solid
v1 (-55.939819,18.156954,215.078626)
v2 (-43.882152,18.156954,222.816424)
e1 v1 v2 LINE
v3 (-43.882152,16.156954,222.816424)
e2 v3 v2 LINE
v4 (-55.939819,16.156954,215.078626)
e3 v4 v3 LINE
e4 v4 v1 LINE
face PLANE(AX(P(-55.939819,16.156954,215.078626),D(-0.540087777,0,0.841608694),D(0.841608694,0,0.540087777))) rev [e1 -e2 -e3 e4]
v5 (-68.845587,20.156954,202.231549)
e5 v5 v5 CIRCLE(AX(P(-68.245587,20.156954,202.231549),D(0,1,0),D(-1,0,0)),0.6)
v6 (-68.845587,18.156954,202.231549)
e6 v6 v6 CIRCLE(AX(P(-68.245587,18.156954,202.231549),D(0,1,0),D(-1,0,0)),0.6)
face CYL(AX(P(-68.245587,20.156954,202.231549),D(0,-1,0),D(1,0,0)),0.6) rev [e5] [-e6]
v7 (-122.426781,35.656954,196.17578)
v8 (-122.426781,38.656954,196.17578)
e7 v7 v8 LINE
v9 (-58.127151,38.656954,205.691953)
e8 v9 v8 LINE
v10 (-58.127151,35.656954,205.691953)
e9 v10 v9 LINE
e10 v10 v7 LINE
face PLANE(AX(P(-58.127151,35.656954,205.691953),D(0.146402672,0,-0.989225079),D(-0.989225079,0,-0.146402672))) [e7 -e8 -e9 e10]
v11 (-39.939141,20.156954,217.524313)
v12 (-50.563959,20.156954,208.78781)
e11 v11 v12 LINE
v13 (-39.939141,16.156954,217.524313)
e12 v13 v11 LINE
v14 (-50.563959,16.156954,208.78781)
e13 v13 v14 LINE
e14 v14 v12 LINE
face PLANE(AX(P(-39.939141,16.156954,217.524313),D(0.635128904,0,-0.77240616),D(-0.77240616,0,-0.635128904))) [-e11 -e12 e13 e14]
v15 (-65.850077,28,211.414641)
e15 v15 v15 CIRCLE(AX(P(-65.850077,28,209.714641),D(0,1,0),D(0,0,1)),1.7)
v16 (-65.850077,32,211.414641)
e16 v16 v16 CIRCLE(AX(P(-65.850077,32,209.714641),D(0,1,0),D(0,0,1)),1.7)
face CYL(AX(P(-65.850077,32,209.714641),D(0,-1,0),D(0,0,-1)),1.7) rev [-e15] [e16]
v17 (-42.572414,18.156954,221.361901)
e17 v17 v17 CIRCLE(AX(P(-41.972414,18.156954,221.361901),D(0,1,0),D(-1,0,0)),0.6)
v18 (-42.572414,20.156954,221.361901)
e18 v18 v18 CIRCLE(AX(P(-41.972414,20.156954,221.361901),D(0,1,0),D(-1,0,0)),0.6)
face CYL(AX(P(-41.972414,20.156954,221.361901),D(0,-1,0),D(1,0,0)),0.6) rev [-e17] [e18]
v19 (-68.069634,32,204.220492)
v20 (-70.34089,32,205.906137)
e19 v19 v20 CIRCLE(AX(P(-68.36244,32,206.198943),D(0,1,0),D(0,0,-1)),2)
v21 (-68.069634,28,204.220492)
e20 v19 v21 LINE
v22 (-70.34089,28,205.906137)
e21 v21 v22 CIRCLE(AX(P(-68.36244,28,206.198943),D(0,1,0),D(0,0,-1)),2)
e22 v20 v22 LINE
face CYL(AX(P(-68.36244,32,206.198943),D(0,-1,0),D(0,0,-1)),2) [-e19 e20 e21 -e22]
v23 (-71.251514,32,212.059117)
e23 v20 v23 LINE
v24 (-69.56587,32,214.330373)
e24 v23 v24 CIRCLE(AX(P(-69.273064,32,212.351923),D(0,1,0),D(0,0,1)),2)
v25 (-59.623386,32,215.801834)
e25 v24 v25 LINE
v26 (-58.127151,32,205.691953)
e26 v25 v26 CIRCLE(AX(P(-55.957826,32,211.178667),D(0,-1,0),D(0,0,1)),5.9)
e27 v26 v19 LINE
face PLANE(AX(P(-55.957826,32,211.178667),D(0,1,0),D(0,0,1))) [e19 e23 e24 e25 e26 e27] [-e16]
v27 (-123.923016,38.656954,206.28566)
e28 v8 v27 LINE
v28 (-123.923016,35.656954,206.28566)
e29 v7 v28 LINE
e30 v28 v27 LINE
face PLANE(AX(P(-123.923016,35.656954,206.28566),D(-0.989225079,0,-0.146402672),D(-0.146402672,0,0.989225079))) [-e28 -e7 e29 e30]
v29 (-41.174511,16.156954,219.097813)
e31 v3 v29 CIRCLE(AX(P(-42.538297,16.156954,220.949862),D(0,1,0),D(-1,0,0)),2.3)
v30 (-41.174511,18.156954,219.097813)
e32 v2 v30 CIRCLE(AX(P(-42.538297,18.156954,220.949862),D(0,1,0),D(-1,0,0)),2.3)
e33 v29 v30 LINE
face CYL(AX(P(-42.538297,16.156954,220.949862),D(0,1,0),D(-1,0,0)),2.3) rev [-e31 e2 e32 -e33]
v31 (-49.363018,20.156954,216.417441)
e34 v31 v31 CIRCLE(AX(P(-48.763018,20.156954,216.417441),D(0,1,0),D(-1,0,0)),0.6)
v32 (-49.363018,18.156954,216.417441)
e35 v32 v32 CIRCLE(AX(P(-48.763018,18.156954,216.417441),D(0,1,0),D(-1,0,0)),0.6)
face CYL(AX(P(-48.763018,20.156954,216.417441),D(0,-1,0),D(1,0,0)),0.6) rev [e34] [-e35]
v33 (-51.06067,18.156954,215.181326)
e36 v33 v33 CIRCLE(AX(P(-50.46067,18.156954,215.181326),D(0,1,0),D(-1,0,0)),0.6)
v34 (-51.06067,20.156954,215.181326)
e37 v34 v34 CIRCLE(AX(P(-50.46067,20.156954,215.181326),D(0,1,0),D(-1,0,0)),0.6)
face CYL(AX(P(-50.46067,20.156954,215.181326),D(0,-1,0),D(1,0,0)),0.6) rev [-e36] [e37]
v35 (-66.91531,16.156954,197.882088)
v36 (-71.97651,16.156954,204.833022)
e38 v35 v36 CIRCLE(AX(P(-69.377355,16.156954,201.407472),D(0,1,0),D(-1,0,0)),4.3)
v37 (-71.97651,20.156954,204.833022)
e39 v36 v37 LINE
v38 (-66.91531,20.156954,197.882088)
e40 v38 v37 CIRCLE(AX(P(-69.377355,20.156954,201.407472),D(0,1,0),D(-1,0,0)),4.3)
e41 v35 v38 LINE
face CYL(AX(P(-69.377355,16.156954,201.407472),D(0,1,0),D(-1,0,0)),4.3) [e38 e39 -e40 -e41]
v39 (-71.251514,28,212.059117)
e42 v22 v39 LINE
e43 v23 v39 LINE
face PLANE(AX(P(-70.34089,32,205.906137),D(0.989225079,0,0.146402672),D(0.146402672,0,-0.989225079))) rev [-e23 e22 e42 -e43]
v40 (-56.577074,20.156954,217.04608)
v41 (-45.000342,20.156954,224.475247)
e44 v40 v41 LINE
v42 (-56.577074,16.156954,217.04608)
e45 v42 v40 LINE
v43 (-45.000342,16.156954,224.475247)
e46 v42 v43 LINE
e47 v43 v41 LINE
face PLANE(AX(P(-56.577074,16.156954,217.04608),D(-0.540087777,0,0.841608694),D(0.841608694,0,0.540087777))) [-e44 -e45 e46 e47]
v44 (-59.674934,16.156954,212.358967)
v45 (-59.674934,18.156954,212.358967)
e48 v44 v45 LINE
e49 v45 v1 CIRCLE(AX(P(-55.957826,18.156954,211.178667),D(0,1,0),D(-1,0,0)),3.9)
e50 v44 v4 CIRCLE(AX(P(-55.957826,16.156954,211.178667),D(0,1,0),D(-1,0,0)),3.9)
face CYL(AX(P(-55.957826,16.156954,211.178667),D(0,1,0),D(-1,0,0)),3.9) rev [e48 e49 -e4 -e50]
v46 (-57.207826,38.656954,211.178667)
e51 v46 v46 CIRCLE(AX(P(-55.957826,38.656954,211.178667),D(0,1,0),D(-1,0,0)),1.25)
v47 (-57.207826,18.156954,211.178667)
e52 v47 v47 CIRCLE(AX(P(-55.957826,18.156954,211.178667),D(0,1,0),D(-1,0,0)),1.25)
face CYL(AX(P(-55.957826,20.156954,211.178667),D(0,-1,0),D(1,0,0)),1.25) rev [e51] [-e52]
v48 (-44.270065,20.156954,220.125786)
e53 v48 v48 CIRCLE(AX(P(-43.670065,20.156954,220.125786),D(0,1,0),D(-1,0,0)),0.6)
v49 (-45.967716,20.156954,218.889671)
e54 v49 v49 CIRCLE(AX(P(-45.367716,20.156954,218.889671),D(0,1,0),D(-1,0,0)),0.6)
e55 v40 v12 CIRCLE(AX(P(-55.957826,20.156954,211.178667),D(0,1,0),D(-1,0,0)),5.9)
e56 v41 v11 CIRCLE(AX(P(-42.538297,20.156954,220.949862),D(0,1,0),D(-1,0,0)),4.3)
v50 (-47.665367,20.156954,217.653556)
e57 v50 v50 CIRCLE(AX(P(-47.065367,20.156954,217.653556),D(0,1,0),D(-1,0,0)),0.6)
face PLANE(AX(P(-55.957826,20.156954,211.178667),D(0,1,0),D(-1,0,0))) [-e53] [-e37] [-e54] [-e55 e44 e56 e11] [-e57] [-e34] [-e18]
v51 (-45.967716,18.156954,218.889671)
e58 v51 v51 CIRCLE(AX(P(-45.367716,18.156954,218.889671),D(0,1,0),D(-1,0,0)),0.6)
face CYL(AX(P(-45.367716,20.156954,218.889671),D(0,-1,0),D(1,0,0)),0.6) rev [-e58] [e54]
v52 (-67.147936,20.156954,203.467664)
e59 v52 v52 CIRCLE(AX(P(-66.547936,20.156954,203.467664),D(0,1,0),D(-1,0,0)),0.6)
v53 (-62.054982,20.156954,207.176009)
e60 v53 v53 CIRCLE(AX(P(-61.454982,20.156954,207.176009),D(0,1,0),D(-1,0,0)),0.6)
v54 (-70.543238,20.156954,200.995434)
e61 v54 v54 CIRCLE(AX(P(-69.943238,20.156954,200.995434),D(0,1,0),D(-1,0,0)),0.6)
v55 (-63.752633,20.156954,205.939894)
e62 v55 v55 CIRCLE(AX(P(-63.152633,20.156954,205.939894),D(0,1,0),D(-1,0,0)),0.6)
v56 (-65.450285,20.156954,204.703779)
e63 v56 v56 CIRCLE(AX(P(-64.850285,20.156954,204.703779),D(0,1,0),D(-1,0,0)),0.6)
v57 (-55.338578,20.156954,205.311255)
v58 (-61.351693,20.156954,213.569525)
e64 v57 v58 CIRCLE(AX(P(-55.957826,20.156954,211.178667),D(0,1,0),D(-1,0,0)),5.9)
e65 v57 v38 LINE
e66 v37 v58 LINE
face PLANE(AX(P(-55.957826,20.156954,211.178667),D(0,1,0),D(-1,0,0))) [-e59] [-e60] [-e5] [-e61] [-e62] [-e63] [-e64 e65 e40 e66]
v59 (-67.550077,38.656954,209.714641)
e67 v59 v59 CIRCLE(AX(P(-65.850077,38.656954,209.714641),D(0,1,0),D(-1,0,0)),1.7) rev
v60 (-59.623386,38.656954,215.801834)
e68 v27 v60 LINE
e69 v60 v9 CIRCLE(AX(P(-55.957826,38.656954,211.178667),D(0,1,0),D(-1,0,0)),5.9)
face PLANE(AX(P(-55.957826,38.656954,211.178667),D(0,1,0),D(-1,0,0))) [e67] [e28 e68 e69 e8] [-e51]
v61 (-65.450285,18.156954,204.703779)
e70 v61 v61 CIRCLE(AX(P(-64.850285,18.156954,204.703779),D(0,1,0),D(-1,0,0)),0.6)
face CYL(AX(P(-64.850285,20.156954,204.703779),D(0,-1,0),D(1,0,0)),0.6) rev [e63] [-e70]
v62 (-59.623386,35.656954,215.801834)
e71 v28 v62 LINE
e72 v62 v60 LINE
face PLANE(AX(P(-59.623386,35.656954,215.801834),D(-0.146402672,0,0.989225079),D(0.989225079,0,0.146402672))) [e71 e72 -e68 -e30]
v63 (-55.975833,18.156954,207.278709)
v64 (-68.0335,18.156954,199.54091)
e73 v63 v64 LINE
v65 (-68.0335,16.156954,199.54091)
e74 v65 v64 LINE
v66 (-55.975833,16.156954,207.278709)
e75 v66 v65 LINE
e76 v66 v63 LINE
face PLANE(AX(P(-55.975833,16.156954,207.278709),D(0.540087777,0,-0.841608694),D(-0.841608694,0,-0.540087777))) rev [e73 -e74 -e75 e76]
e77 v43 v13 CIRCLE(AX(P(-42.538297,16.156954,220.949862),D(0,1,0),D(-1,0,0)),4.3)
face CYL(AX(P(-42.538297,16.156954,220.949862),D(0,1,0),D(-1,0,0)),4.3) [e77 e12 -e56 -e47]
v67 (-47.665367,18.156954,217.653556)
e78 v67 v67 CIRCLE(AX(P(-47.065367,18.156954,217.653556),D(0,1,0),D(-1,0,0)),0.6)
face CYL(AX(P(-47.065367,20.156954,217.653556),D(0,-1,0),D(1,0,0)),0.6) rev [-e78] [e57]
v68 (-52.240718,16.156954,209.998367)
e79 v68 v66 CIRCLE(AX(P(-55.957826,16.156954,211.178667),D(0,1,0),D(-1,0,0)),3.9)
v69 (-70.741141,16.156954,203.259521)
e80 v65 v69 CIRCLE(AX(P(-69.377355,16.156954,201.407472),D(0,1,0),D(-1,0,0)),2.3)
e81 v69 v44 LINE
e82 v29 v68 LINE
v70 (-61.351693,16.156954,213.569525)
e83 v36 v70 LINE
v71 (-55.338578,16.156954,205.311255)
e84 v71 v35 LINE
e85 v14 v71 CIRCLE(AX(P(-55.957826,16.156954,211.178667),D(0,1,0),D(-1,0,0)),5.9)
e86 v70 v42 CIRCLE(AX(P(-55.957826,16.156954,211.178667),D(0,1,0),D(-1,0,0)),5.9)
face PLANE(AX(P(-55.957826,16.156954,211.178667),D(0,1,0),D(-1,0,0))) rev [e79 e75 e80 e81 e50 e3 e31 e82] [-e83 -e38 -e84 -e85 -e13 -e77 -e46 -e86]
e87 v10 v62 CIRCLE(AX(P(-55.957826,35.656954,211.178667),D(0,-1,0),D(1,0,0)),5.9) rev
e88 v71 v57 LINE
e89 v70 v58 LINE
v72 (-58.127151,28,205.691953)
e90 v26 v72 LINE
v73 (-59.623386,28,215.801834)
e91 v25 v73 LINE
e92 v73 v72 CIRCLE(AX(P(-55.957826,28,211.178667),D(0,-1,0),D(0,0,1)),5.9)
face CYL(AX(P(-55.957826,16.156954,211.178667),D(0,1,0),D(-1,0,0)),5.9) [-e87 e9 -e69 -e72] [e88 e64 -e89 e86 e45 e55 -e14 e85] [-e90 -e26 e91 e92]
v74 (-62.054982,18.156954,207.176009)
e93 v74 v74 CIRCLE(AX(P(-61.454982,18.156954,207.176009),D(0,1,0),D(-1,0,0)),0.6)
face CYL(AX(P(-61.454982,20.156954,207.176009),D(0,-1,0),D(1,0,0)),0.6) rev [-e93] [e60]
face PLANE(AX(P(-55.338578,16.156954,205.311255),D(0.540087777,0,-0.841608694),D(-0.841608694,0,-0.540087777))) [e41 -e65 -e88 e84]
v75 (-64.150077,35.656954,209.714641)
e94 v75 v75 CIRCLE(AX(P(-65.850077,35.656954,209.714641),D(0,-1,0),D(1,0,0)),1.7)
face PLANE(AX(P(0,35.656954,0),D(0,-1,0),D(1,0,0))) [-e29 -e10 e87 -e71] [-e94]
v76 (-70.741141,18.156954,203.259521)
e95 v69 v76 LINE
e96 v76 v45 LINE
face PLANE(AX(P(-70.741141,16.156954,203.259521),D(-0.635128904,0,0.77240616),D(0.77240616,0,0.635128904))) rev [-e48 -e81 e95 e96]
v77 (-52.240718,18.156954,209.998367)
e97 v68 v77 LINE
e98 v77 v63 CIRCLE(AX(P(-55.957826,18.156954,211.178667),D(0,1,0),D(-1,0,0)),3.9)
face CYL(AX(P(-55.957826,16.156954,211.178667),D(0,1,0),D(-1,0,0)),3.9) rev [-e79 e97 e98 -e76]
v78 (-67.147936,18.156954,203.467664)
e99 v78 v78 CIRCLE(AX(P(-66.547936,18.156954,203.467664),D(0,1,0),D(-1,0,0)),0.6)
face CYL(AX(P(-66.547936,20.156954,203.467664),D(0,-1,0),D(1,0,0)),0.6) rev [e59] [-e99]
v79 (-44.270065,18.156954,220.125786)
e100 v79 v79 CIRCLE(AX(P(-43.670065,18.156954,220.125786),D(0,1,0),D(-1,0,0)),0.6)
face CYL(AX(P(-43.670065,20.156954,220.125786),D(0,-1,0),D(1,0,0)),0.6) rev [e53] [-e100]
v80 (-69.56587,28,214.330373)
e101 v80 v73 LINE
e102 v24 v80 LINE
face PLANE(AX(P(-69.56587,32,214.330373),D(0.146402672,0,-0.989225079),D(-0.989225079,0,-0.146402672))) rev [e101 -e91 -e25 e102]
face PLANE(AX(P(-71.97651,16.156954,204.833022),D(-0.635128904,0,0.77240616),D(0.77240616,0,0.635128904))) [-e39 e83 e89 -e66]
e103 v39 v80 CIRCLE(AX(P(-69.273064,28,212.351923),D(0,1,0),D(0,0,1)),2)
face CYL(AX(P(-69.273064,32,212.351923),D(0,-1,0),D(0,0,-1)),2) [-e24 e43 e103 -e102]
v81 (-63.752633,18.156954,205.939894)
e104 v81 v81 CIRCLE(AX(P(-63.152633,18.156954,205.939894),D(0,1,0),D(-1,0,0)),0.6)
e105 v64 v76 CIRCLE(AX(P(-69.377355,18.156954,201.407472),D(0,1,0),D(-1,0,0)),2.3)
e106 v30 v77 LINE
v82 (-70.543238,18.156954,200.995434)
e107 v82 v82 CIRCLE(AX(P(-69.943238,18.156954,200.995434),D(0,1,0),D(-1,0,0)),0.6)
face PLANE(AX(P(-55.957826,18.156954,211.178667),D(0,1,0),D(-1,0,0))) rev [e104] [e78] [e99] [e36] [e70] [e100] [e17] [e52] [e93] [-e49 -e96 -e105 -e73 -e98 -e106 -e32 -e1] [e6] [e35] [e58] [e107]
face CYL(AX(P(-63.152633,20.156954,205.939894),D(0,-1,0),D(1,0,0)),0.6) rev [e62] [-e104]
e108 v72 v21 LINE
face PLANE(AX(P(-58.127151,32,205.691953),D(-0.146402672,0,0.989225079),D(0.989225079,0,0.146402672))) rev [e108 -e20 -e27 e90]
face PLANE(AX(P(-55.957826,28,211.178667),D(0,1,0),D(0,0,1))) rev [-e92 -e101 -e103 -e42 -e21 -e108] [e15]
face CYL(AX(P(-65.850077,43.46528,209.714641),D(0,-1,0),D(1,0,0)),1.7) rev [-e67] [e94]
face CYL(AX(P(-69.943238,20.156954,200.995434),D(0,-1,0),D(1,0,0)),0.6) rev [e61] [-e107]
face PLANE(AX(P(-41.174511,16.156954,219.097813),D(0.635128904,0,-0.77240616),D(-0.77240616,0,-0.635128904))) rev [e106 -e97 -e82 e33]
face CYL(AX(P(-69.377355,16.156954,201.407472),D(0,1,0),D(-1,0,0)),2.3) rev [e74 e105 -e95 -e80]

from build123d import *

# Parameters (mm, degrees)
EXTRUDE_START       = -2
EXTRUDE_1_DEPTH     = 2
SKETCH_2_R          = 0.6
SKETCH_2_R_2        = 1.25
EXTRUDE_2_DEPTH     = 2
SKETCH_3_R          = 5.9
SKETCH_3_R_2        = 1.25
EXTRUDE_3_DEPTH     = 18.5
EXTRUDE_4_DEPTH     = 3
SKETCH_5_R          = 1.7
CUT_EXTRUDE_1_DEPTH = 3
SKETCH_6_R          = 1.7
EXTRUDE_5_DEPTH     = 4


# Read off the part's stored shape, not the designer's step: 填料-伸長1
with BuildPart() as part:
    # 填料-伸長1 outline → 填料-伸長1 (new body)
    with BuildSketch(Plane(origin=(0, 18.156954032, 0), x_dir=(1, 0, 0), z_dir=(0, 1, 0)).offset(EXTRUDE_START)):
        with BuildLine():
            Line((-71.976510321, -204.833021781), (-61.351692907, -213.569524655))
            ThreePointArc((-61.351692907, -213.569524655), (-59.430720516, -215.948258819), (-56.577073779, -217.046080048))
            Line((-56.577073779, -217.046080048), (-45.000342303, -224.475246616))
            ThreePointArc((-45.000342303, -224.475246616), (-39.06215434, -223.480955011), (-39.939141491, -217.524312868))
            Line((-39.939141491, -217.524312868), (-50.563958905, -208.787809993))
            ThreePointArc((-50.563958905, -208.787809993), (-52.484931295, -206.409075829), (-55.338578032, -205.311254601))
            Line((-55.338578032, -205.311254601), (-66.915309509, -197.882088033))
            ThreePointArc((-66.915309509, -197.882088033), (-72.853497472, -198.876379638), (-71.976510321, -204.833021781))
        make_face()
        with BuildLine():
            ThreePointArc((-55.939819286, -215.078625755), (-58.253468106, -214.331448143), (-59.674933886, -212.358967399))
            Line((-59.674933886, -212.358967399), (-70.741141252, -203.259521387))
            ThreePointArc((-70.741141252, -203.259521387), (-71.236686796, -200.053632048), (-68.033499603, -199.540910248))
            Line((-68.033499603, -199.540910248), (-55.975832526, -207.278708894))
            ThreePointArc((-55.975832526, -207.278708894), (-53.662183706, -208.025886506), (-52.240717926, -209.998367249))
            Line((-52.240717926, -209.998367249), (-41.17451056, -219.097813262))
            ThreePointArc((-41.17451056, -219.097813262), (-40.678965016, -222.303702601), (-43.882152209, -222.8164244))
            Line((-43.882152209, -222.8164244), (-55.939819286, -215.078625755))
        make_face(mode=Mode.SUBTRACT)
    extrude(amount=EXTRUDE_1_DEPTH)

    # 草圖2 → 填料-伸長2 (add)
    with BuildSketch(Plane(origin=(0, 18.156954032, 0), x_dir=(1, 0, 0), z_dir=(0, 1, 0))):
        with BuildLine():
            Line((-56.577073779, -217.046080048), (-45.000342303, -224.475246616))
            ThreePointArc((-45.000342303, -224.475246616), (-39.06215434, -223.480955011), (-39.939141491, -217.524312868))
            Line((-39.939141491, -217.524312868), (-50.563958905, -208.787809993))
            ThreePointArc((-50.563958905, -208.787809993), (-52.484931296, -206.409075829), (-55.338578032, -205.311254601))
            Line((-55.338578032, -205.311254601), (-66.915309509, -197.882088033))
            ThreePointArc((-66.915309509, -197.882088033), (-72.853497472, -198.876379638), (-71.976510321, -204.833021781))
            Line((-71.976510321, -204.833021781), (-61.351692907, -213.569524655))
            ThreePointArc((-61.351692907, -213.569524655), (-59.430720516, -215.948258819), (-56.577073779, -217.046080048))
        make_face()
        with Locations(Location((-69.943238255, -200.995433976, 0), (0, 0, 180))):
            Circle(SKETCH_2_R, mode=Mode.SUBTRACT)
        with Locations(Location((-68.245587045, -202.231549007, 0), (0, 0, 180))):
            Circle(SKETCH_2_R, mode=Mode.SUBTRACT)
        with Locations(Location((-66.547935835, -203.467664037, 0), (0, 0, 180))):
            Circle(SKETCH_2_R, mode=Mode.SUBTRACT)
        with Locations(Location((-64.850284625, -204.703779068, 0), (0, 0, 180))):
            Circle(SKETCH_2_R, mode=Mode.SUBTRACT)
        with Locations(Location((-63.152633415, -205.939894099, 0), (0, 0, 180))):
            Circle(SKETCH_2_R, mode=Mode.SUBTRACT)
        with Locations(Location((-61.454982205, -207.17600913, 0), (0, 0, 180))):
            Circle(SKETCH_2_R, mode=Mode.SUBTRACT)
        with Locations(Location((-55.957825906, -211.178667324, 0), (0, 0, 180))):
            Circle(SKETCH_2_R_2, mode=Mode.SUBTRACT)
        with Locations(Location((-50.460669607, -215.181325519, 0), (0, 0, 180))):
            Circle(SKETCH_2_R, mode=Mode.SUBTRACT)
        with Locations(Location((-48.763018397, -216.41744055, 0), (0, 0, 180))):
            Circle(SKETCH_2_R, mode=Mode.SUBTRACT)
        with Locations(Location((-47.065367187, -217.65355558, 0), (0, 0, 180))):
            Circle(SKETCH_2_R, mode=Mode.SUBTRACT)
        with Locations(Location((-45.367715977, -218.889670611, 0), (0, 0, 180))):
            Circle(SKETCH_2_R, mode=Mode.SUBTRACT)
        with Locations(Location((-43.670064767, -220.125785642, 0), (0, 0, 180))):
            Circle(SKETCH_2_R, mode=Mode.SUBTRACT)
        with Locations(Location((-41.972413557, -221.361900673, 0), (0, 0, 180))):
            Circle(SKETCH_2_R, mode=Mode.SUBTRACT)
    extrude(amount=EXTRUDE_2_DEPTH)

    # 草圖3 → 填料-伸長3 (add)
    with BuildSketch(Plane(origin=(0, 20.156954032, 0), x_dir=(1, 0, 0), z_dir=(0, 1, 0))):
        with Locations(Location((-55.957825906, -211.178667324, 0), (0, 0, 180))):
            Circle(SKETCH_3_R)
        with Locations(Location((-55.957825906, -211.178667324, 0), (0, 0, 180))):
            Circle(SKETCH_3_R_2, mode=Mode.SUBTRACT)
    extrude(amount=EXTRUDE_3_DEPTH)

    # 草圖4 → 填料-伸長4 (add)
    with BuildSketch(Plane(origin=(0, 38.656954032, 0), x_dir=(1, 0, 0), z_dir=(0, 1, 0))):
        Polygon((-59.623386181, -215.801833758), (-58.127150876, -205.691953447), (-122.426781037, -196.175779785), (-123.923016342, -206.285660097), align=None)
    extrude(amount=-EXTRUDE_4_DEPTH)

    # 草圖5 → 除料-伸長1 (cut)
    with BuildSketch(Plane.XZ.offset(-35.656954032)):
        with Locations((-65.8500767, 209.714640607)):
            Circle(SKETCH_5_R)
    extrude(amount=-CUT_EXTRUDE_1_DEPTH, mode=Mode.SUBTRACT)

    # 草圖6 → 填料-伸長5 (add)
    with BuildSketch(Plane(origin=(0, 28, 0), x_dir=(1, 0, 0), z_dir=(0, 1, 0))):
        with BuildLine():
            Line((-70.340889788, -205.906137252), (-71.251514406, -212.059117246))
            ThreePointArc((-71.251514406, -212.059117246), (-70.879084415, -213.543853469), (-69.565869591, -214.330372748))
            Line((-69.565869591, -214.330372748), (-59.623386181, -215.801833758))
            ThreePointArc((-59.623386181, -215.801833758), (-61.794253874, -210.314891561), (-58.127150876, -205.691953447))
            Line((-58.127150876, -205.691953447), (-68.069634286, -204.220492436))
            ThreePointArc((-68.069634286, -204.220492436), (-69.554370509, -204.592922428), (-70.340889788, -205.906137252))
        make_face()
        with Locations((-65.8500767, -209.714640607)):
            Circle(SKETCH_6_R, mode=Mode.SUBTRACT)
    extrude(amount=EXTRUDE_5_DEPTH)


solid = part.part
